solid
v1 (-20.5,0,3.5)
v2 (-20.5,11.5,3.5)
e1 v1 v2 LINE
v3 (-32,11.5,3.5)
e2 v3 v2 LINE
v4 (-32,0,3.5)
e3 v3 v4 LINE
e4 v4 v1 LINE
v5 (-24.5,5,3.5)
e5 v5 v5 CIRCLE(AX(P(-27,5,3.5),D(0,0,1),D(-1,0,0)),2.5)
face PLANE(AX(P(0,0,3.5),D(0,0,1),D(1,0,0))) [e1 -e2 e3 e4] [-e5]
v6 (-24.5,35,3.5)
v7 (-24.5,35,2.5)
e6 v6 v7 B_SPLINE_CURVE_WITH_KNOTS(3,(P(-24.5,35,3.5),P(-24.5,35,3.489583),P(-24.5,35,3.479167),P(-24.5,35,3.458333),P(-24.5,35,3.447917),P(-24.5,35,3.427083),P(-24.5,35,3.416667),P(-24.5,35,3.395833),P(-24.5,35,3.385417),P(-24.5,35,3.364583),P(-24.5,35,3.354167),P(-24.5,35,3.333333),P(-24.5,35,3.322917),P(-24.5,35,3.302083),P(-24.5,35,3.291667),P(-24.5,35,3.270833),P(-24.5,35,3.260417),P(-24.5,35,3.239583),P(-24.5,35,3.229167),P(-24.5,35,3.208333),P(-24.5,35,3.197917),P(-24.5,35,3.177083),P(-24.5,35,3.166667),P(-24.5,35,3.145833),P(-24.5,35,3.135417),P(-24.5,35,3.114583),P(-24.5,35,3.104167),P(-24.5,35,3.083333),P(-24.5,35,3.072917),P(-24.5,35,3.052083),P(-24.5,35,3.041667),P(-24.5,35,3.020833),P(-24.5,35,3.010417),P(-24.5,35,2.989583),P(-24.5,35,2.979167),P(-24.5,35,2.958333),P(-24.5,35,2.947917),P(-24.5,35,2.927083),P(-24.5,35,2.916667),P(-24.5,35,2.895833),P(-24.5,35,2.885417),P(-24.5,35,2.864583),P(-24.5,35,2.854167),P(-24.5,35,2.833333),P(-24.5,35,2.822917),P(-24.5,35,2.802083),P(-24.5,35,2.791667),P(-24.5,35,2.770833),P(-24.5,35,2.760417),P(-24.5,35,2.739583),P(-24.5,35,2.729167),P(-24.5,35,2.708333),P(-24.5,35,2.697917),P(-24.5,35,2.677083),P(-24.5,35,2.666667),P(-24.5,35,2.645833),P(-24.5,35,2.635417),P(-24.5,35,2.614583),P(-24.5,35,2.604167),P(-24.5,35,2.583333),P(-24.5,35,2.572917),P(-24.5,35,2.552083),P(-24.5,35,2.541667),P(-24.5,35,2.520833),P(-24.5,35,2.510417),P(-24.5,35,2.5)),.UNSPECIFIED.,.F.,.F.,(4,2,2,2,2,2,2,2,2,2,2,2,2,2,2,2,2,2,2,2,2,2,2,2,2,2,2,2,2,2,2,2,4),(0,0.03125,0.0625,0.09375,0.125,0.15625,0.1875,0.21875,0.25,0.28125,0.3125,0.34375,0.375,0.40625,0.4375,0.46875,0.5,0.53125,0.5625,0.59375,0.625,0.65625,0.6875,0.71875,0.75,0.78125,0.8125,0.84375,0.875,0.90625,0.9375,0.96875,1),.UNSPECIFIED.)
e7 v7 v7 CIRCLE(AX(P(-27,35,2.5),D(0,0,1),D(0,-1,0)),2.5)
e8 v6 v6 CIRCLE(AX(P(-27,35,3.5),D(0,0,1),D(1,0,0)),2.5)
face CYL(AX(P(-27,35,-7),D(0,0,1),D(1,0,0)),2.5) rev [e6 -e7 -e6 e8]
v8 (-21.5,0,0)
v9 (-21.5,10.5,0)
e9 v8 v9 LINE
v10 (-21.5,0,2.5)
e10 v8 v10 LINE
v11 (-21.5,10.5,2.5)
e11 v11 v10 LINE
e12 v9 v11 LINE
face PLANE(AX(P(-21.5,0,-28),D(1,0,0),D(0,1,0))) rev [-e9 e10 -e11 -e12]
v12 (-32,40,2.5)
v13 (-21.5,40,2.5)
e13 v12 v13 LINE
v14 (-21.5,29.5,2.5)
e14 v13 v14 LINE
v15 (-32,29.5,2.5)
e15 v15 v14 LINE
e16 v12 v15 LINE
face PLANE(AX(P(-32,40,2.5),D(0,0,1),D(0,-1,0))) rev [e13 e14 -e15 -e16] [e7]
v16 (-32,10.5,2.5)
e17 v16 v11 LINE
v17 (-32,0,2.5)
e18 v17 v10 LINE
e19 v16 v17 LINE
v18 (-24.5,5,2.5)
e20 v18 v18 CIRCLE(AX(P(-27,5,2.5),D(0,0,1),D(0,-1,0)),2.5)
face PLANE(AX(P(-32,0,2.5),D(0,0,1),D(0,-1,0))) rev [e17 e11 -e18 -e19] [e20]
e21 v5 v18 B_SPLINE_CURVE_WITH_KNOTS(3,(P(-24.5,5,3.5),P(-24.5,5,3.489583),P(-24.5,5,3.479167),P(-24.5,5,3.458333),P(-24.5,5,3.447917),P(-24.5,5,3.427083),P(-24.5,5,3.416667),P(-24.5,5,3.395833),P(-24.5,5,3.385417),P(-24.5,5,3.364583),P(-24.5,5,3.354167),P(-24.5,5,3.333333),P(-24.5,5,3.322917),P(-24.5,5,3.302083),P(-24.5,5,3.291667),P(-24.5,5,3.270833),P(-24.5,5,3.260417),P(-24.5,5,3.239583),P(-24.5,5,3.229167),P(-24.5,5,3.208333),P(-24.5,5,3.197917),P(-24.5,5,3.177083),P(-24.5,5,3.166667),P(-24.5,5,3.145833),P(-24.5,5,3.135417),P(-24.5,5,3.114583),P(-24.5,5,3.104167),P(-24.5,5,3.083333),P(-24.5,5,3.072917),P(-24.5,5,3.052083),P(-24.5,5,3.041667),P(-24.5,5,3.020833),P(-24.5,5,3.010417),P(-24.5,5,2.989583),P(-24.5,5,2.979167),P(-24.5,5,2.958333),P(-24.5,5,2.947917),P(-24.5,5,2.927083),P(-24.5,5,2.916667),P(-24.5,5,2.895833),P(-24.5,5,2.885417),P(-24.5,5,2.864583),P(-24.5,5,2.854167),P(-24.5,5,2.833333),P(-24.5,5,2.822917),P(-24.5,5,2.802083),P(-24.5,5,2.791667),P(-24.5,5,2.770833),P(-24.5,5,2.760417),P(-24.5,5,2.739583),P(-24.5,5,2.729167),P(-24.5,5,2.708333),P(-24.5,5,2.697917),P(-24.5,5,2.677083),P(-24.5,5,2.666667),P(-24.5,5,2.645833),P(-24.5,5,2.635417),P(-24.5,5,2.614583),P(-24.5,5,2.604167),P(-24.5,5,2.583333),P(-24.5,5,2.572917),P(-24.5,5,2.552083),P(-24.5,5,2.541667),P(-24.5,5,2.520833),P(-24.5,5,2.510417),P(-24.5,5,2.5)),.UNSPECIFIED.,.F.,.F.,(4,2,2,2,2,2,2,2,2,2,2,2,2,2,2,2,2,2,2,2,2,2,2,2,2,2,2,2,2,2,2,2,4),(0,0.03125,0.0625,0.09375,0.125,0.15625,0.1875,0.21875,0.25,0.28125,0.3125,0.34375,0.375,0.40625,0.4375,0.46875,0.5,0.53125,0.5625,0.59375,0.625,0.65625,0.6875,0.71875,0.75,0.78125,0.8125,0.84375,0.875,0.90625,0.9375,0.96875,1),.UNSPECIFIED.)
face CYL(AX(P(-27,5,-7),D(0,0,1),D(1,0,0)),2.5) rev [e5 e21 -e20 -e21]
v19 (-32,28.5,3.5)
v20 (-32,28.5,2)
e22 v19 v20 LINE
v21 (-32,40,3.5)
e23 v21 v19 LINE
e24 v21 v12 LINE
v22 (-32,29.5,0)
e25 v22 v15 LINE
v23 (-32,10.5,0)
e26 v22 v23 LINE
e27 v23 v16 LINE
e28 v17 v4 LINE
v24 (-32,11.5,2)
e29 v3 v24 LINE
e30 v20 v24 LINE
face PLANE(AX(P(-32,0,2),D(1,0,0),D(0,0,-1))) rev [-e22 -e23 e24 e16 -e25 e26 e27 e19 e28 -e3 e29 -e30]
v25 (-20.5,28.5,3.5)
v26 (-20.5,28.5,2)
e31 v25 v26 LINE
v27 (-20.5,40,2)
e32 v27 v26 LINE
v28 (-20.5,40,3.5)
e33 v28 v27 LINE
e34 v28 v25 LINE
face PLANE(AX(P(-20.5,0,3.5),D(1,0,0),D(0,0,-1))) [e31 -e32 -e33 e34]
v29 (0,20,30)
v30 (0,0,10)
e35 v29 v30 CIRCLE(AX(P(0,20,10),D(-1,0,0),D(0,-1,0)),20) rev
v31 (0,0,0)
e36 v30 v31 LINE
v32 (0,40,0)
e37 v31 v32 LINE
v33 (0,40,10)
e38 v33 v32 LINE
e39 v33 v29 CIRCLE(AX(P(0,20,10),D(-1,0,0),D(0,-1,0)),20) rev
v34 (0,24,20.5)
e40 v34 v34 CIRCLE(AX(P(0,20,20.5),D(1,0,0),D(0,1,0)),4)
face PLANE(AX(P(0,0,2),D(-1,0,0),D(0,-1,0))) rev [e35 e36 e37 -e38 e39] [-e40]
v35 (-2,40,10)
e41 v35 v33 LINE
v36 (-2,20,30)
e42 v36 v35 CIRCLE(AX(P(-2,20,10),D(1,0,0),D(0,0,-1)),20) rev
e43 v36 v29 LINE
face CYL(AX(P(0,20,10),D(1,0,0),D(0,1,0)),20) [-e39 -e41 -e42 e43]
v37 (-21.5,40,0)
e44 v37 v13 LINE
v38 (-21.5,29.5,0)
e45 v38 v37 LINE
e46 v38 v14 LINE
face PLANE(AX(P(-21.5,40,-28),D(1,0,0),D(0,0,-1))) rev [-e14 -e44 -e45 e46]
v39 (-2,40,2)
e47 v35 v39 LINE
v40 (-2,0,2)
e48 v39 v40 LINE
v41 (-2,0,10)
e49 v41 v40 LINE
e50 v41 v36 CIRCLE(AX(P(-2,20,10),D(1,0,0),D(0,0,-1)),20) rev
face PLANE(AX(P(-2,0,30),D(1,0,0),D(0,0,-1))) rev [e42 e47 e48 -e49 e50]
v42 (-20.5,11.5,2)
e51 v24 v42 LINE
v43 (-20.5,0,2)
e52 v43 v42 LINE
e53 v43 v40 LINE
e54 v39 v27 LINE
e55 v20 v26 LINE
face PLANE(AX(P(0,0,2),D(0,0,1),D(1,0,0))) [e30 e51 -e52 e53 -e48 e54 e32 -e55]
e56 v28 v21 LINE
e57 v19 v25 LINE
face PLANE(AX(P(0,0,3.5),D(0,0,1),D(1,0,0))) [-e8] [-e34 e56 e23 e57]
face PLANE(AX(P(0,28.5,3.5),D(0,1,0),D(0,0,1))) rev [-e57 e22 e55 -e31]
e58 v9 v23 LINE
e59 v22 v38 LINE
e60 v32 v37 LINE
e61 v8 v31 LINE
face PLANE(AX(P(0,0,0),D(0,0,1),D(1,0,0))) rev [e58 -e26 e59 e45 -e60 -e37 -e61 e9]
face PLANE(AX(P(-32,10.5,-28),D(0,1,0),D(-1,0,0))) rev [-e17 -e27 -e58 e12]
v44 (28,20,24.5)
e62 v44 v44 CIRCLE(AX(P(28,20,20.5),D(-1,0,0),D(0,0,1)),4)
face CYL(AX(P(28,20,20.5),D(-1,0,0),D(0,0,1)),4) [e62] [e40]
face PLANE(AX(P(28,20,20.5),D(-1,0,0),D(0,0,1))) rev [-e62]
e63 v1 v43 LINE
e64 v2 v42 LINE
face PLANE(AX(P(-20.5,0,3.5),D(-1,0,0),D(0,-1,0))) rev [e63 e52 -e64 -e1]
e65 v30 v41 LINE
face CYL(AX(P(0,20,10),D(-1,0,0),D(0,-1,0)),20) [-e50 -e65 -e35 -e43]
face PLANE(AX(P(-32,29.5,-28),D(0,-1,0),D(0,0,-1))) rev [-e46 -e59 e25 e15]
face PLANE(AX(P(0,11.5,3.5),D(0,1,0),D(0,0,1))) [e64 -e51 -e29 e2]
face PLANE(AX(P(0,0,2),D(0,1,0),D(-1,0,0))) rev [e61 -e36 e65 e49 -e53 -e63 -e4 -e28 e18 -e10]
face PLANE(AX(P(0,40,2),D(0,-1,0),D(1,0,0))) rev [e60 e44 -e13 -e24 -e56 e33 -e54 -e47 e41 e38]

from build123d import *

# Parameters (mm, degrees)
ESQUISSE1_W             = 32
ESQUISSE1_H             = 40
BOSS_EXTRU_1_DEPTH      = 2
ESQUISSE2_W             = 2
ESQUISSE2_H             = 40
BOSS_EXTRU_2_DEPTH      = 28
CONG_1_R                = 20
ESQUISSE3_R             = 4
ENL_V_MAT_EXTRU_1_DEPTH = 30
ESQUISSE4_W             = 10.5
ESQUISSE4_H             = 10.5
ENL_V_MAT_EXTRU_2_DEPTH = 30
ESQUISSE5_W             = 1
ESQUISSE5_H             = 1
ESQUISSE5_W_2           = 10.5
ESQUISSE5_H_2           = 10.5
BOSS_EXTRU_5_DEPTH      = 1.5
ESQUISSE6_W             = 1
ESQUISSE6_H             = 10.5
BOSS_EXTRU_6_DEPTH      = 10.5
ESQUISSE7_R             = 2.5
ENL_V_MAT_EXTRU_3_DEPTH = 10.5
BOSS_EXTRU_7_START      = -30
ESQUISSE8_R             = 4
BOSS_EXTRU_7_DEPTH      = 30


with BuildPart() as part:
    # Esquisse1 → Boss.-Extru.1 (new body)
    with BuildSketch(Plane.XY):
        with Locations((-16, 20)):
            Rectangle(ESQUISSE1_W, ESQUISSE1_H)
    extrude(amount=BOSS_EXTRU_1_DEPTH)

    # Esquisse2 → Boss.-Extru.2 (add)
    with BuildSketch(Plane.XY.offset(2)):
        with Locations((-1, 20)):
            Rectangle(ESQUISSE2_W, ESQUISSE2_H)
    extrude(amount=BOSS_EXTRU_2_DEPTH)

    # Congé1
    cong_1_edges = [part.edges().sort_by_distance(p)[0] for p in [
        (-1, 40, 30),
        (-1, 0, 30),
    ]]
    fillet(cong_1_edges, radius=CONG_1_R - 0.0001)  # a hair under: the kernel refuses the full size

    # Esquisse3 → Enlèv. mat.-Extru.1 (cut)
    with BuildSketch(Plane(origin=(0, 0, 0), x_dir=(0, 0, -1), z_dir=(1, 0, 0))):
        with Locations(Location((-20.5, 20, 0), (0, 0, 90))):
            Circle(ESQUISSE3_R)
    extrude(amount=-ENL_V_MAT_EXTRU_1_DEPTH, mode=Mode.SUBTRACT)

    # Esquisse4 → Enlèv. mat.-Extru.2 (cut)
    with BuildSketch(Plane.XY.offset(2)):
        with Locations((-26.75, 34.75)):
            Rectangle(ESQUISSE4_W, ESQUISSE4_H)
        with Locations((-26.75, 5.25)):
            Rectangle(ESQUISSE4_W, ESQUISSE4_H)
    extrude(amount=-ENL_V_MAT_EXTRU_2_DEPTH, mode=Mode.SUBTRACT)

    # Esquisse5 → Boss.-Extru.5 (add)
    with BuildSketch(Plane.XY.offset(2)):
        with Locations((-21, 29)):
            Rectangle(ESQUISSE5_W, ESQUISSE5_H)
        with Locations((-26.75, 29)):
            Rectangle(ESQUISSE5_W_2, ESQUISSE5_H)
        with Locations((-21, 34.75)):
            Rectangle(ESQUISSE5_W, ESQUISSE5_H_2)
        with Locations((-21, 11)):
            Rectangle(ESQUISSE5_W, ESQUISSE5_H)
        with Locations((-21, 5.25)):
            Rectangle(ESQUISSE5_W, ESQUISSE5_H_2)
        with Locations((-26.75, 11)):
            Rectangle(ESQUISSE5_W_2, ESQUISSE5_H)
    extrude(amount=BOSS_EXTRU_5_DEPTH)

    # Esquisse6 → Boss.-Extru.6 (add)
    with BuildSketch(Plane.ZY.offset(21.5)):
        with Locations((3, 34.75)):
            Rectangle(ESQUISSE6_W, ESQUISSE6_H)
        with Locations((3, 5.25)):
            Rectangle(ESQUISSE6_W, ESQUISSE6_H)
    extrude(amount=BOSS_EXTRU_6_DEPTH)

    # Esquisse7 → Enlèv. mat.-Extru.3 (cut)
    with BuildSketch(Plane.XY.offset(3.5)):
        with Locations((-27, 35)):
            Circle(ESQUISSE7_R)
        with Locations((-27, 5)):
            Circle(ESQUISSE7_R)
    extrude(amount=-ENL_V_MAT_EXTRU_3_DEPTH, mode=Mode.SUBTRACT)

    # Esquisse8 → Boss.-Extru.7 (add)
    with BuildSketch(Plane.ZY.offset(2).offset(BOSS_EXTRU_7_START)):
        with Locations((20.5, 20)):
            Circle(ESQUISSE8_R)
    extrude(amount=BOSS_EXTRU_7_DEPTH)


solid = part.part
